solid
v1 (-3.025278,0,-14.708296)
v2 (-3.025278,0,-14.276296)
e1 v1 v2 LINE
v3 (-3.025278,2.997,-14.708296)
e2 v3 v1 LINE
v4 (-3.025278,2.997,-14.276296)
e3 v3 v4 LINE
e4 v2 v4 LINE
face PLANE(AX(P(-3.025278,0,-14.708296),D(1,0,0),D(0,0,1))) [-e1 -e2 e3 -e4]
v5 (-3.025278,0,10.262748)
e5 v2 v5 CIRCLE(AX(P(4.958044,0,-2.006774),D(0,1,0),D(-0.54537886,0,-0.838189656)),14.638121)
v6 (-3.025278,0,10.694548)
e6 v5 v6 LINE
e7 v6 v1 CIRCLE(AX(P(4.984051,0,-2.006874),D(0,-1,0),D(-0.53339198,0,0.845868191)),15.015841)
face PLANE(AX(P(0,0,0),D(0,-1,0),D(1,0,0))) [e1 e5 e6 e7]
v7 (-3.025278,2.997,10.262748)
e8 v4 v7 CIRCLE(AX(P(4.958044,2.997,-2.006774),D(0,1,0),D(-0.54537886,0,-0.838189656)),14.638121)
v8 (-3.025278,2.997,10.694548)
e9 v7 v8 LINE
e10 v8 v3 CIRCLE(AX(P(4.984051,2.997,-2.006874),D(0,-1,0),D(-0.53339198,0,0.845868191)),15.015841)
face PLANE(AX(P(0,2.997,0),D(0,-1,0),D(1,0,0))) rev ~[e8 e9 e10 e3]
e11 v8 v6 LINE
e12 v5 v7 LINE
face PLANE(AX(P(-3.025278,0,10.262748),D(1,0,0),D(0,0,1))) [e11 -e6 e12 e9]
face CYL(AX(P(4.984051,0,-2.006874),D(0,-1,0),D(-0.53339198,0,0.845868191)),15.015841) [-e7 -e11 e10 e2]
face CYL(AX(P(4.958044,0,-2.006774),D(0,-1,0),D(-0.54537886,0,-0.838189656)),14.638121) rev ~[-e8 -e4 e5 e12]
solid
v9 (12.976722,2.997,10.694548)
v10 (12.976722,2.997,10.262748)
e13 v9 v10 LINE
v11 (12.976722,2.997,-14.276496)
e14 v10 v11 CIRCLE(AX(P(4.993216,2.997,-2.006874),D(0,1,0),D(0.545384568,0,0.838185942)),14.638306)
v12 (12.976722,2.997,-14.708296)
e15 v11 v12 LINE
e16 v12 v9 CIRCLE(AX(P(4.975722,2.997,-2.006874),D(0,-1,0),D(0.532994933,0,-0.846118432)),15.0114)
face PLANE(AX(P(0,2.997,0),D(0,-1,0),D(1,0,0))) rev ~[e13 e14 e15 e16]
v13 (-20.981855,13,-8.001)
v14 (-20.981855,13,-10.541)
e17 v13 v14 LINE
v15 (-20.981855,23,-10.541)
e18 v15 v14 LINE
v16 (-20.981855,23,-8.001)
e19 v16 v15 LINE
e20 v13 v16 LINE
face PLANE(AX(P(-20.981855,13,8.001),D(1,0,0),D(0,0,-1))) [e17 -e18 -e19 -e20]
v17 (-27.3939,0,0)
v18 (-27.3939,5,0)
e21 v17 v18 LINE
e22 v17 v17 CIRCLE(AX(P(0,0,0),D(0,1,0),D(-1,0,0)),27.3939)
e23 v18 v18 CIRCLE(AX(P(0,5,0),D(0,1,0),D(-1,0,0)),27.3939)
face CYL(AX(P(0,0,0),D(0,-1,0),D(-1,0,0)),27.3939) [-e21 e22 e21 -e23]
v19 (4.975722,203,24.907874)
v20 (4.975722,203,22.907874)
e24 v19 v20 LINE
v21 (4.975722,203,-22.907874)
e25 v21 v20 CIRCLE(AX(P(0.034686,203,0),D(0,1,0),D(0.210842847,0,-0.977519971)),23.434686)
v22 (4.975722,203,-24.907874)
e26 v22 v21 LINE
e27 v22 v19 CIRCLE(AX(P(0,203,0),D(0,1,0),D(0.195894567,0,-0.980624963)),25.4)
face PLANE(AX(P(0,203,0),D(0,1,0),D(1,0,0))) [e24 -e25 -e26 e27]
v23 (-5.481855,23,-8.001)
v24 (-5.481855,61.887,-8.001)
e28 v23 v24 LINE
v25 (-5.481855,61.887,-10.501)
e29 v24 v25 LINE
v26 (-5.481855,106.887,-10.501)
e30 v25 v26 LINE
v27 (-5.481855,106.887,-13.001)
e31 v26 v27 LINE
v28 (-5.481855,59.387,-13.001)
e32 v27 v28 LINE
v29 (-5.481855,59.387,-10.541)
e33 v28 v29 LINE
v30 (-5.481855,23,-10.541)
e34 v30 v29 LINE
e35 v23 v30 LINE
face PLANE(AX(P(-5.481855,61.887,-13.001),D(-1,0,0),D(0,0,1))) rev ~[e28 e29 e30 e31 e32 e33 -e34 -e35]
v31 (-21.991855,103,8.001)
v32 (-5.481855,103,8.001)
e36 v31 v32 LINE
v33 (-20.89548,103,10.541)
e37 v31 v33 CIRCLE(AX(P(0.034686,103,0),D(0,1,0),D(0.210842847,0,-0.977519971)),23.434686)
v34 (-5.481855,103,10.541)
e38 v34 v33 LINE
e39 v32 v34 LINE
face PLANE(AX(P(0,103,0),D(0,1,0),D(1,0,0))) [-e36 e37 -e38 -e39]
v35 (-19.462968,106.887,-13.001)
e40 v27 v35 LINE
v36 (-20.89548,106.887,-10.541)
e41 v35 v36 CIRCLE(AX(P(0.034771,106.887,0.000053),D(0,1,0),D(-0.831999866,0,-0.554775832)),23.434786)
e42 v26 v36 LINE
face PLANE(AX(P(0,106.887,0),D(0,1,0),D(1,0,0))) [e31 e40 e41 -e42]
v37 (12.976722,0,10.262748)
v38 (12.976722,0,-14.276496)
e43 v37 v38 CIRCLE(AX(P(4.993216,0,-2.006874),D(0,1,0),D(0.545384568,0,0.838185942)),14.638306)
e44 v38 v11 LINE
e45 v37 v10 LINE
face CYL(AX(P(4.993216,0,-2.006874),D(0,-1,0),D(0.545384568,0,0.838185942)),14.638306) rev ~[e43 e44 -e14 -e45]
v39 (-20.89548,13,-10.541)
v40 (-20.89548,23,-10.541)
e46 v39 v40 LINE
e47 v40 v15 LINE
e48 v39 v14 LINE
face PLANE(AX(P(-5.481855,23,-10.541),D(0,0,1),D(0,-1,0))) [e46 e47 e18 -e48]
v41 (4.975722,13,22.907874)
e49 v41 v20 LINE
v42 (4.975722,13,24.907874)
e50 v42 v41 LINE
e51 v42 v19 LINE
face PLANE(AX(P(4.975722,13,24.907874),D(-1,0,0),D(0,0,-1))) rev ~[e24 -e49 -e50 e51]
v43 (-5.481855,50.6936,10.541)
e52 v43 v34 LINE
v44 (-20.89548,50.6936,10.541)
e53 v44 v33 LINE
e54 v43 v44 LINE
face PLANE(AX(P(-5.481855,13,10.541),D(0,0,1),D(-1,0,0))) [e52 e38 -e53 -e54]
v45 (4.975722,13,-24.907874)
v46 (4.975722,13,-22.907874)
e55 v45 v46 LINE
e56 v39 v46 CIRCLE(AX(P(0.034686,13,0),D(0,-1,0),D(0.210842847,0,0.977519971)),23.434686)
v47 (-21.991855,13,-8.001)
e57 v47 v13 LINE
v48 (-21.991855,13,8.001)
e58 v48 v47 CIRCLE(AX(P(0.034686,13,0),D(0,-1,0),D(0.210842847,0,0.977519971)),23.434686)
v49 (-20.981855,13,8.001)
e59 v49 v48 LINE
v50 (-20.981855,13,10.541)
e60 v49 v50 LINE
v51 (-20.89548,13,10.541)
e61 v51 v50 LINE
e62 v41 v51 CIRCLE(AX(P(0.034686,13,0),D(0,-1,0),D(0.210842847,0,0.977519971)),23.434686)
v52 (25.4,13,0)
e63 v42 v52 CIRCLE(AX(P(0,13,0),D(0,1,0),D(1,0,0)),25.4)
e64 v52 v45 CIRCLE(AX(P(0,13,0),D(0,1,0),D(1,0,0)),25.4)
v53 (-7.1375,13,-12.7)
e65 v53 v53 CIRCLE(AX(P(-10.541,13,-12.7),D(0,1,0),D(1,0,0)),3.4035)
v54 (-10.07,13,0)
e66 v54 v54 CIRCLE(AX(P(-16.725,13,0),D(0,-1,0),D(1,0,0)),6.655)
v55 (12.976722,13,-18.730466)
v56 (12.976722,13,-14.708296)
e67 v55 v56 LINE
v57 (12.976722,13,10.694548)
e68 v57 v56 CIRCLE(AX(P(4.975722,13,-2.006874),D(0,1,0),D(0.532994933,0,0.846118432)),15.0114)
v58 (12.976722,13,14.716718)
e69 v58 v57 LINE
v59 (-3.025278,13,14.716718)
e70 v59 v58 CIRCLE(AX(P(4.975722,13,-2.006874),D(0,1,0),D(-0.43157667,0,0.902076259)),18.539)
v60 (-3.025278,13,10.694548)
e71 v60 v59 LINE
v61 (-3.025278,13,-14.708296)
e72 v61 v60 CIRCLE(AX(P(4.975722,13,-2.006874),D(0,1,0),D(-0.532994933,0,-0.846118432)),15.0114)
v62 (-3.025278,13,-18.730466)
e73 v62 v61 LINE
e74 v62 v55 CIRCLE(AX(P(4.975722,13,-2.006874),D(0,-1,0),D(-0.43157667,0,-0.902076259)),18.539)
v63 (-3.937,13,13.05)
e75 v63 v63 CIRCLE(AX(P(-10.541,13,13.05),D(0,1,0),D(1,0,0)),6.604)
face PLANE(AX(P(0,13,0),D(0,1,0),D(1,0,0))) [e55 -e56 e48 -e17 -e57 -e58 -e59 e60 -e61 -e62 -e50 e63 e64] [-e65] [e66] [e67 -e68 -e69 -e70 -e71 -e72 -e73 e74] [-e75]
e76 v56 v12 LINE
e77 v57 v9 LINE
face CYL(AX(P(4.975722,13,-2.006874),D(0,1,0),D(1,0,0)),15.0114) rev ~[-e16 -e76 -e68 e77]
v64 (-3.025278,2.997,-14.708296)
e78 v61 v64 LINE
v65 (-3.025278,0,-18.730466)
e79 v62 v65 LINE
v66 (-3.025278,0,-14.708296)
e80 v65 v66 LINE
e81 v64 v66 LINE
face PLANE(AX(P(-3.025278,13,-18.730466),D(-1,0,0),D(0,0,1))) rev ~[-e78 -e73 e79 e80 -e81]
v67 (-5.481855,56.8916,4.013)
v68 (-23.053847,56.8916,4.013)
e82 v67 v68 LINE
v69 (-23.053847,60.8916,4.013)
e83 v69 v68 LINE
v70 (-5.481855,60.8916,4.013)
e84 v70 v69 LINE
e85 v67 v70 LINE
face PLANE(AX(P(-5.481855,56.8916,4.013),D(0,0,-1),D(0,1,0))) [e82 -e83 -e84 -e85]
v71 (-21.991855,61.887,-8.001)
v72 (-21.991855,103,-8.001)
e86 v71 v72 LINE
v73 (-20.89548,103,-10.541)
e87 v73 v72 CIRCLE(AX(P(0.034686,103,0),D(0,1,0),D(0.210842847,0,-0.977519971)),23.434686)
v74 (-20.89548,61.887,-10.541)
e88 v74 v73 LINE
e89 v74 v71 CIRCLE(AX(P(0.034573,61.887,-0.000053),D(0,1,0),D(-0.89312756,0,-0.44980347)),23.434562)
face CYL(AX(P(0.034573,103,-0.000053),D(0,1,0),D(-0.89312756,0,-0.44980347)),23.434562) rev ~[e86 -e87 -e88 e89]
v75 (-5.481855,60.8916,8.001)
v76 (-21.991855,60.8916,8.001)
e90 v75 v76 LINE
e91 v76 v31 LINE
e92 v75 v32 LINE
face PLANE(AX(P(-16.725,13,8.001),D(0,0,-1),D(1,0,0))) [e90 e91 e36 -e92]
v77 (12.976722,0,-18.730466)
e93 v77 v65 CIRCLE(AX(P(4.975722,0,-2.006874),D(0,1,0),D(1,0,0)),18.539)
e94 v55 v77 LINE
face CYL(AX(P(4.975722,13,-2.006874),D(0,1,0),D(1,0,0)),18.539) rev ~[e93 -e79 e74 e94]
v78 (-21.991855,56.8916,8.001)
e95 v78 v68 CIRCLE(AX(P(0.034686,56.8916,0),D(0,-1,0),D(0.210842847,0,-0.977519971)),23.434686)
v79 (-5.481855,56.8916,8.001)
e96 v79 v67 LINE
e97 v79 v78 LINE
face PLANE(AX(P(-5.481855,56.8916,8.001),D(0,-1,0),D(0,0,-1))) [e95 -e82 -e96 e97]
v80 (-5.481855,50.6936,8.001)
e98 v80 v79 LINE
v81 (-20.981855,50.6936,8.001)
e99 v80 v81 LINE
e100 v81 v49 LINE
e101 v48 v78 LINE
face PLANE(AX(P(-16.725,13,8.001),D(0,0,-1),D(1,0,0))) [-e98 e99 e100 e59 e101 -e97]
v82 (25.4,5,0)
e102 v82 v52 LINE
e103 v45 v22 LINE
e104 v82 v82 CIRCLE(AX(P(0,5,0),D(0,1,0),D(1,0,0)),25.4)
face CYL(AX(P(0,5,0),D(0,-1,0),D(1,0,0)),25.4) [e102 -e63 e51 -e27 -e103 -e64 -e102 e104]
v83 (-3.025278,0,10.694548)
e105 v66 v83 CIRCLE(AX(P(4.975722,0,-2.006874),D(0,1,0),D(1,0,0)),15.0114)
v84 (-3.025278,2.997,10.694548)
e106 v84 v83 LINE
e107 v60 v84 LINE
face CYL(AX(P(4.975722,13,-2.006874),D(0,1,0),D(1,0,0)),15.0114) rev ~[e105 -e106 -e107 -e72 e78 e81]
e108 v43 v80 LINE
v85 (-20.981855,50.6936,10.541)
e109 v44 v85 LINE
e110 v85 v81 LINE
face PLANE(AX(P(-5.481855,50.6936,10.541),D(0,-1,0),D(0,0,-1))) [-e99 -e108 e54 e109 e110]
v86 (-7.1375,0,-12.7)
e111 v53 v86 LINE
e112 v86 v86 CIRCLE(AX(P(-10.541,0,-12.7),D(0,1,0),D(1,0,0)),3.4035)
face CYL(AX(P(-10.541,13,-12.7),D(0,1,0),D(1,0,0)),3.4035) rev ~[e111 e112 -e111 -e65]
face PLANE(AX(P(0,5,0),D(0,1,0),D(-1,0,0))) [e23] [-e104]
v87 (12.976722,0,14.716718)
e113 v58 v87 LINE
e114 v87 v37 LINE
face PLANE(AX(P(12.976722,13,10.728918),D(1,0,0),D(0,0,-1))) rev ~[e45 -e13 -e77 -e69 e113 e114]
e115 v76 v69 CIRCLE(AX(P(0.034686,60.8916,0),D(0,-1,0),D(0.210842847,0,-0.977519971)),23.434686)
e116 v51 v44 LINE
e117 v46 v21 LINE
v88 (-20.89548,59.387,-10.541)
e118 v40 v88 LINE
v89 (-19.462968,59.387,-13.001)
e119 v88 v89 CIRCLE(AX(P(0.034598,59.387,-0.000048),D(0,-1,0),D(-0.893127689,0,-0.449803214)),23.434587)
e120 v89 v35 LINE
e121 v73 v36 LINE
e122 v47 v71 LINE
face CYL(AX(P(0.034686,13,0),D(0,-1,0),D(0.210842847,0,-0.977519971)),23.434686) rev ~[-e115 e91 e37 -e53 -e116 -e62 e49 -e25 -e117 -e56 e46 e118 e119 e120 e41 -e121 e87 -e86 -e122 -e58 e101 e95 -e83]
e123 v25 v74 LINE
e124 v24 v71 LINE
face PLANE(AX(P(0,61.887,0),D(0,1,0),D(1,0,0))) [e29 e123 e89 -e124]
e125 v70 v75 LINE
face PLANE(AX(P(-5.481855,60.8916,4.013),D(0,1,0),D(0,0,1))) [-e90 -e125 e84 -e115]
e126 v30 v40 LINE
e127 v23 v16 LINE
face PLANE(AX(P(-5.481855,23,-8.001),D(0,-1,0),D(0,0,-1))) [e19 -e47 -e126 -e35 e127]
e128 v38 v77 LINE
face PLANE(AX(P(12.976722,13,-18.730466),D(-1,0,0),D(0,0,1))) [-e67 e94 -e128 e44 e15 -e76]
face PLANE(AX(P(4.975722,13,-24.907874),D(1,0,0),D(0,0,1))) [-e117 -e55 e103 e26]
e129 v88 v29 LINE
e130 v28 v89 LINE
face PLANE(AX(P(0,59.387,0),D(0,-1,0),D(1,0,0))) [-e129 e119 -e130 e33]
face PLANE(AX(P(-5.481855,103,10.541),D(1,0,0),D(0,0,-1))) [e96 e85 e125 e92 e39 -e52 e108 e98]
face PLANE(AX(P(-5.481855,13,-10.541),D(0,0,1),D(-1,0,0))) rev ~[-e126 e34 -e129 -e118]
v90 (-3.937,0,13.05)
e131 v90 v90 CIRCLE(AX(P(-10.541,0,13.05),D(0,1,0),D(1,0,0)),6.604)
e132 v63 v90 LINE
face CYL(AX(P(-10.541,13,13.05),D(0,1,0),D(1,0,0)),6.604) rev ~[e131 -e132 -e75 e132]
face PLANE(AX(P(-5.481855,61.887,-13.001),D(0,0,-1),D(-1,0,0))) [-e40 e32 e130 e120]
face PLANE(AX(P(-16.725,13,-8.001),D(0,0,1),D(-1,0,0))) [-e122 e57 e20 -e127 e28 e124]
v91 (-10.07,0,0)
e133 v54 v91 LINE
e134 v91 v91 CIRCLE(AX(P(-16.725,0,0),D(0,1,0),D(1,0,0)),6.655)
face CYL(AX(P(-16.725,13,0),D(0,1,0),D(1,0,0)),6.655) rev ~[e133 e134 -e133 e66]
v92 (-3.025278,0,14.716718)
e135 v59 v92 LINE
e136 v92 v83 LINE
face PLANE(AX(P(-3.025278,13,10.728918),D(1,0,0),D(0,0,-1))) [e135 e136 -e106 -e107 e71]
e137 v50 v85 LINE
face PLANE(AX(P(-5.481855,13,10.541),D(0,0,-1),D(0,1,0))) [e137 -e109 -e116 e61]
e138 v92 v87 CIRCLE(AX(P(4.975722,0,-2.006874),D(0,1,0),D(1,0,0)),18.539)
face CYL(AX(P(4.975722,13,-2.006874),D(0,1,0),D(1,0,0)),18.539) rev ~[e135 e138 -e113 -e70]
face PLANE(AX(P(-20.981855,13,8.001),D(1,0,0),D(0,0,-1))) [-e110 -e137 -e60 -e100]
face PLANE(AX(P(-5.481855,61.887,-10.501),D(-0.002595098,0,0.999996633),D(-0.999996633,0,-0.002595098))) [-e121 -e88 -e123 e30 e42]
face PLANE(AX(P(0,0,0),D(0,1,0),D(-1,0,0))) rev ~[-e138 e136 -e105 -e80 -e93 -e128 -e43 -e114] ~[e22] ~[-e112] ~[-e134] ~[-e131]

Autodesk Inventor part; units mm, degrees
ref_plane "YZ Plane" through (0, 0, 0) normal (1, 0, 0) x (0, 1, 0)
ref_plane "XZ Plane" through (0, 0, 0) normal (0, 1, 0) x (-1, 0, 0)
ref_plane "XY Plane" through (0, 0, 0) normal (0, 0, 1) x (1, 0, 0)
sketch "Sketch1" plane through (0, 0, 0) normal (0, 1, 0) x (-1, 0, 0)
  circle A0 centre (0, 0) radius 27.3939
  dimension "d0" = 54.7878
extrude "Extrusion1" add sketch "Sketch1" along normal blind 5
sketch "Sketch2" plane through (0, 5, 0) normal (0, 1, 0) x (1, 0, 0)
  circle A0 centre (0, 0) radius 25.4
  dimension "d3" = 50.8
extrude "Extrusion2" add sketch "Sketch2" along normal blind 8
sketch "Sketch3" plane through (0, 13, 0) normal (0, 1, 0) x (1, 0, 0)
  line L0 (0, 0) -> (0, 25.4)
  circle A0 centre (0, 0) radius 25.4
  line L1 (0, 0) -> (0, -25.4)
  arc A1 (0, 25.4) -> (0, -25.4) centre (0, 0) ccw
  line L2 (0, -25.4) -> (4.975722, -24.907874)
  arc A2 (0, -25.4) -> (4.975722, -24.907874) centre (0, 0) ccw
  line L3 (0, 25.4) -> (4.975722, 24.907874)
  arc A3 (4.975722, 24.907874) -> (0, 25.4) centre (0, 0) ccw
  line L4 (4.975722, 24.907874) -> (4.975722, 22.907874)
  line L5 (4.975722, -24.907874) -> (4.975722, -22.907874)
  line L6 (-25.4, 0) -> (-23.4, 0)
  arc A4 (4.975722, 22.907874) -> (4.975722, -22.907874) centre (0.034686, 0) ccw
  dimension "d6" = 25.4
  dimension "d7" = 5
  dimension "d8" = 5
  dimension "d9" = 2
  dimension "d10" = 2
  dimension "d11" = 2
extrude "Extrusion3" add sketch "Sketch3" along normal blind 190 contours A4 L6 A0 L0 | L0 L3 L4 A4 | A4 L5 L2 L1 | L1 A0 L6 A4 | A0 L3 | L2 A0
sketch "Sketch4" plane through (0, 13, 0) normal (0, 1, 0) x (1, 0, 0)
  line L0 (4.975722, 22.907874) -> (4.975722, 24.907874)
  line L1 (4.975722, 22.907874) -> (4.975722, 20.545874)
  line L2 (4.975722, 20.545874) -> (4.975722, -16.532126)
  line L3 (4.975722, -16.532126) -> (4.975722, 2.006874)
  circle A0 centre (4.975722, 2.006874) radius 18.539
  line L4 (4.975722, -16.532126) -> (-3.025278, -16.532126)
  line L5 (-3.025278, -16.532126) -> (4.975722, -16.532126)
  line L6 (4.975722, -16.532126) -> (12.976722, -16.532126)
  line L7 (4.975722, 20.545874) -> (12.976722, 20.545874)
  line L8 (4.975722, 20.545874) -> (-3.025278, 20.545874)
  line L9 (-3.025278, 20.545874) -> (-3.025278, 18.730466)
  line L10 (12.976722, 20.545874) -> (12.976722, 18.730466)
  line L11 (12.976722, -16.532126) -> (12.976722, -14.716718)
  line L12 (-3.025278, -16.532126) -> (-3.025278, -14.716718)
  arc A1 (-3.025278, -14.716718) -> (12.976722, -14.716718) centre (4.975722, 2.006874) ccw
  arc A2 (12.976722, 18.730466) -> (-3.025278, 18.730466) centre (4.975722, 2.006874) ccw
  line L13 (12.976722, -14.716718) -> (12.976722, -10.728918)
  line L14 (-3.025278, -14.716718) -> (-3.025278, -10.728918)
  line L15 (-3.025278, 18.730466) -> (-3.025278, 14.742666)
  line L16 (12.976722, 18.730466) -> (12.976722, 14.742666)
  circle A3 centre (4.975722, 2.006874) radius 15.0114
  line L17 (12.976722, -10.728918) -> (12.976722, -10.694548)
  line L18 (-3.025278, -10.728918) -> (-3.025278, -10.694548)
  line L19 (-3.025278, 14.742666) -> (-3.025278, 14.708296)
  line L20 (12.976722, 14.742666) -> (12.976722, 14.708296)
  point P0 (0, 0)
  dimension "d14" = 2.362
  dimension "d15" = 37.078
  dimension "d16" = 18.539
  dimension "d18" = 8.001
  dimension "d19" = 8.001
  dimension "d20" = 8.001
  dimension "d21" = 8.001
  dimension "d22" = 3.9878
  dimension "d23" = 3.9878
  dimension "d24" = 3.9878
  dimension "d25" = 3.9878
  dimension "d26" = 30.0228
extrude "Extrusion4" cut sketch "Sketch4" against normal blind 15 contours A0 L16 L20 A3 L2 | L2 A3 L19 L15 A0 | A3 L2 | L2 A3 | L14 L18 A3 L2 A0 | A3 L17 L13 A0 L2
sketch "Sketch5" plane through (0, 0, 0) normal (0, -1, 0) x (1, 0, 0)
  arc A0 (-3.025278, 10.694548) -> (-3.025278, -14.708296) centre (4.975722, -2.006874) ccw
  line L0 (-3.025278, 10.694548) -> (-3.025278, 10.262748)
  line L1 (-3.025278, -14.708296) -> (-3.025278, -14.276296)
  line L2 (12.976722, -14.708296) -> (12.976722, -14.276496)
  arc A1 (12.976722, -14.708296) -> (12.976722, 10.694548) centre (4.975722, -2.006874) ccw
  line L3 (12.976722, 10.694548) -> (12.976722, 10.262748)
  line L4 (19.987122, -2.006874) -> (19.631522, -2.006874)
  line L5 (-10.035678, -2.006874) -> (-9.680078, -2.006874)
  arc A2 (-3.025278, 10.262748) -> (-3.025278, -14.276296) centre (4.958044, -2.006774) ccw
  arc A3 (-3.025278, 10.694548) -> (-3.025278, -14.708296) centre (4.975722, -2.006874) ccw
  arc A4 (-3.025278, 10.694548) -> (-3.025278, -14.708296) centre (4.984051, -2.006874) ccw
  arc A5 (12.976722, -14.276496) -> (12.976722, 10.262748) centre (4.993216, -2.006874) ccw
  arc A6 (12.976722, -14.708296) -> (12.976722, 10.694548) centre (4.975722, -2.006874) ccw
  point P0 (0, 0)
  dimension "d29" = 0.4318
  dimension "d30" = 0.432
  dimension "d31" = 0.4318
  dimension "d32" = 0.4318
  dimension "d33" = 0.3556
  dimension "d34" = 0.3556
sketch "Sketch5 outline for Extrusion5" plane through (0, 0, 0) normal (0, -1, 0) x (1, 0, 0)
  line L0 (-3.025278, 10.262748) -> (-3.025278, 10.694548)
  arc A0 (-3.025278, -14.276296) -> (-3.025278, 10.262748) centre (4.958044, -2.006774) cw
  line L1 (-3.025278, -14.708296) -> (-3.025278, -14.276296)
  arc A1 (-3.025278, 10.694548) -> (-3.025278, -14.708296) centre (4.984051, -2.006874) ccw
  line L2 (12.976722, 10.694548) -> (12.976722, 10.262748)
  arc A2 (12.976722, -14.708296) -> (12.976722, 10.694548) centre (4.975722, -2.006874) ccw
  line L3 (12.976722, -14.276496) -> (12.976722, -14.708296)
  arc A3 (12.976722, 10.262748) -> (12.976722, -14.276496) centre (4.993216, -2.006874) cw
extrude "Extrusion5" add sketch "Sketch5 outline for Extrusion5" against normal blind 2.997
sketch "Sketch6" plane through (0, 13, 0) normal (0, 1, 0) x (1, 0, 0)
  line L0 (0, 0) -> (-16.725, 0)
  circle A0 centre (-16.725, 0) radius 6.655
  line L1 (-16.725, 0) -> (-16.725, 12.7)
  line L2 (0, 0) -> (0, 28.039513)
  line L3 (-16.725, 12.7) -> (0, 12.7)
  line L4 (0, 12.7) -> (-10.541, 12.7)
  circle A1 centre (-10.541, 12.7) radius 3.4035
  line L5 (-16.725, 0) -> (-16.725, -13.05)
  line L6 (-16.725, -13.05) -> (0.459, -13.05)
  line L7 (0.459, -13.05) -> (-10.541, -13.05)
  circle A2 centre (-10.541, -13.05) radius 6.604
  dimension "d37" = 16.725
  dimension "d38" = 13.31
  dimension "d39" = 12.7
  dimension "d40" = 10.541
  dimension "d41" = 6.807
  dimension "d42" = 13.05
  dimension "d43" = 11
  dimension "d44" = 13.208
extrude "Extrusion6" cut sketch "Sketch6" against normal blind 15 contours A0 L5 L0 | L0 L1 A0 | L5 A0 L1 | A1 L3 | L3 A1 | A2 L6 L5 | L5 L6 A2
sketch "Sketch12" plane through (0, 13, 0) normal (0, 1, 0) x (1, 0, 0)
  circle A0 centre (-16.725, 0) radius 6.655
  line L0 (-16.725, 0) -> (-16.725, -8.001)
  line L1 (-16.725, 0) -> (-16.725, 8.001)
  line L2 (-16.725, 8.001) -> (-21.991855, 8.001)
  arc A1 (4.975722, 22.907874) -> (4.975722, -22.907874) centre (0.034686, 0) ccw
  line L3 (-21.991855, 8.001) -> (-5.481855, 8.001)
  line L4 (-16.725, -8.001) -> (-21.991855, -8.001)
  line L5 (-21.991855, -8.001) -> (-5.481855, -8.001)
  line L6 (-5.481855, -8.001) -> (-5.481855, -10.541)
  line L7 (-5.481855, -10.541) -> (-20.89548, -10.541)
  line L8 (-5.481855, 8.001) -> (-5.481855, 10.541)
  line L9 (-5.481855, 10.541) -> (-20.89548, 10.541)
  arc A2 (-20.89548, 10.541) -> (-21.991855, 8.001) centre (0.034686, 0) ccw
  arc A3 (-21.991855, -8.001) -> (-20.89548, -10.541) centre (0.034686, 0) ccw
  point P0 (0, 0)
  dimension "d74" = 8.001
  dimension "d75" = 8.001
  dimension "d76" = 16.51
  dimension "d77" = 16.51
  dimension "d78" = 2.54
  dimension "d79" = 2.54
extrude "Extrusion10" add sketch "Sketch12" along normal blind 90 contours L2 A1 L9 L8 L3 | L5 L6 L7 A1 L4
sketch "Sketch13" plane through (-5.481855, 13, 8.001) normal (1, 0, 0) x (0, 0, -1)
  line L0 (0, 0) -> (-2.54, 0)
  line L1 (-2.54, 0) -> (-2.54, 37.6936)
  line L2 (-2.54, 37.6936) -> (0, 37.6936)
  line L3 (0, 37.6936) -> (0, 0)
  line L4 (16.002, 0) -> (18.542, 0) projected
  line L5 (18.542, 0) -> (16.002, 0)
  line L6 (16.002, 0) -> (16.002, 10)
  line L7 (16.002, 10) -> (18.542, 10)
  line L8 (18.542, 10) -> (18.542, 0)
  line L9 (16.002, 10) -> (16.002, 48.8874)
  line L10 (16.002, 48.8874) -> (18.542, 48.8874)
  line L11 (18.542, 90) -> (18.542, 0) projected
  line L12 (18.542, 48.8874) -> (18.542, 90)
  line L13 (16.002, 0) -> (16.002, 90) projected
  line L14 (16.002, 90) -> (16.002, 48.8874)
  line L15 (18.542, 90) -> (16.002, 90)
  point P0 (8.001, -13)
  dimension "d83" = 37.6936
  dimension "d84" = 10
  dimension "d85" = 38.8874
sketch "Sketch14" plane through (0, 103, 0) normal (0, 1, 0) x (1, 0, 0)
  line L0 (-5.481855, 8.001) -> (-5.481855, 10.541)
  line L1 (-5.481855, 10.541) -> (-5.481855, 8.001)
  line L2 (-5.481855, 10.541) -> (-20.801621, 10.541)
  arc A0 (-20.89548, 10.541) -> (-21.991855, 8.001) centre (0.034686, 0) ccw
  arc A1 (-20.89548, 10.541) -> (-20.89548, -10.541) centre (0.034686, 0) ccw
  line L3 (-5.481855, 8.001) -> (-21.991855, 8.001)
  line L4 (-5.481855, 10.541) -> (-20.89548, 10.541)
  point P0 (0, 0)
extrude "Extrusion11" cut sketch "Sketch14" against normal blind 41.113
sketch "Sketch15" plane through (0, 13, 0) normal (0, -1, 0) x (1, 0, 0)
  line L0 (-20.89548, -10.541) -> (-5.481855, -10.541)
  line L1 (-5.481855, -10.541) -> (-20.89548, -10.541)
  line L2 (-8.787002, -8.001) -> (-21.991855, -8.001)
  line L3 (-5.481763, -8.001) -> (-21.991855, -8.001)
  arc A0 (-21.991855, -8.001) -> (-20.89548, -10.541) centre (0.034686, 0) ccw
  line L4 (-16.649824, 10.541) -> (-5.481855, 10.541)
  line L5 (-5.481855, 10.541) -> (-21.991855, 10.541)
  line L6 (-5.481855, 8.001) -> (-6.21287, 8.001)
  line L7 (-5.481855, 10.541) -> (-5.481855, 8.001)
  line L8 (-5.481855, 8.001) -> (-20.514232, 8.001)
  line L9 (-5.481855, 10.541) -> (-21.991855, 10.541)
  arc A1 (4.975722, 22.907874) -> (-20.89548, 10.541) centre (0.034686, 0) ccw
  line L10 (-20.89548, 10.541) -> (-23.544024, 10.541)
  line L11 (-23.544024, 10.541) -> (-21.025013, 10.541)
  line L12 (-20.89548, 10.541) -> (-5.481855, 10.541)
  line L13 (-5.481855, 8.001) -> (-24.106928, 8.001)
  circle A2 centre (0, 0) radius 25.4
  arc A3 (-23.109464, 10.541) -> (-24.106928, 8.001) centre (0, 0) ccw
  line L14 (-23.109464, 10.541) -> (-5.481855, 10.541)
extrude "Extrusion12" cut sketch "Sketch13" against normal blind 15.5 contours L0 L1 L2 L3 | L6 L7 L8 L4
sketch "Sketch16" plane through (0, 61.887, 0) normal (0, 1, 0) x (1, 0, 0)
  line L0 (-5.481855, 8.001) -> (-21.991855, 8.001)
  line L1 (-5.481855, 8.001) -> (-5.481855, 13.001)
  line L2 (-5.481855, 10.501) -> (-20.89548, 10.541)
  arc A0 (-20.89548, 10.541) -> (-21.991855, 8.001) centre (0.034686, 0) ccw
  arc A1 (-20.89548, 10.541) -> (-21.991855, 8.001) centre (0.034686, 0) ccw
  line L3 (-5.481855, 13.001) -> (-19.462968, 13.001)
  arc A2 (-19.462968, 13.001) -> (-20.89548, 10.541) centre (0.034686, 0) ccw
  point P0 (0, 0)
  dimension "d90" = 5
extrude "Extrusion13" add sketch "Sketch16" along normal blind 45 contours L2 A2 L3 L1
sketch "Sketch17" plane through (0, 61.887, 0) normal (0, -1, 0) x (1, 0, 0)
  line L0 (-5.481855, -13.001) -> (-5.481855, -10.541)
  arc A0 (-20.89548, -10.541) -> (-19.462968, -13.001) centre (0.034686, 0) ccw
  line L1 (-20.89548, -10.541) -> (-5.481855, -10.541)
  line L2 (-20.89548, -10.541) -> (-5.481855, -10.541)
  line L3 (-5.481855, -13.001) -> (-19.462968, -13.001)
  line L4 (-19.462968, -13.001) -> (-5.481855, -13.001)
  arc A1 (-20.89548, -10.541) -> (-19.462968, -13.001) centre (0.034686, 0) ccw
  point P0 (0, 0)
extrude "Extrusion14" add sketch "Sketch17" along normal blind 2.5
sketch "Sketch18" plane through (-5.481855, 103, 10.541) normal (1, 0, 0) x (0, 0, -1)
  line L0 (0, -52.3064) -> (2.54, -52.3064)
  line L1 (2.54, -52.3064) -> (2.54, -46.1084)
  line L2 (2.54, -52.3064) -> (6.5278, -52.3064)
  line L3 (2.54, -46.1084) -> (2.54, -50.0964)
  line L4 (2.54, -52.3064) -> (2.54, 0) projected
  line L5 (2.54, -46.1084) -> (6.528, -46.1084)
  line L6 (6.528, -46.1084) -> (6.528, -42.1084)
  line L7 (6.528, -42.1084) -> (2.54, -42.1084)
  point P0 (10.541, -103)
  dimension "d95" = 6.198
  dimension "d97" = 3.9878
  dimension "d98" = 3.988
  dimension "d99" = 3.988
  dimension "d100" = 4
extrude "Extrusion15" add sketch "Sketch18" against normal blind 18
properties part number "shortened chassis"
